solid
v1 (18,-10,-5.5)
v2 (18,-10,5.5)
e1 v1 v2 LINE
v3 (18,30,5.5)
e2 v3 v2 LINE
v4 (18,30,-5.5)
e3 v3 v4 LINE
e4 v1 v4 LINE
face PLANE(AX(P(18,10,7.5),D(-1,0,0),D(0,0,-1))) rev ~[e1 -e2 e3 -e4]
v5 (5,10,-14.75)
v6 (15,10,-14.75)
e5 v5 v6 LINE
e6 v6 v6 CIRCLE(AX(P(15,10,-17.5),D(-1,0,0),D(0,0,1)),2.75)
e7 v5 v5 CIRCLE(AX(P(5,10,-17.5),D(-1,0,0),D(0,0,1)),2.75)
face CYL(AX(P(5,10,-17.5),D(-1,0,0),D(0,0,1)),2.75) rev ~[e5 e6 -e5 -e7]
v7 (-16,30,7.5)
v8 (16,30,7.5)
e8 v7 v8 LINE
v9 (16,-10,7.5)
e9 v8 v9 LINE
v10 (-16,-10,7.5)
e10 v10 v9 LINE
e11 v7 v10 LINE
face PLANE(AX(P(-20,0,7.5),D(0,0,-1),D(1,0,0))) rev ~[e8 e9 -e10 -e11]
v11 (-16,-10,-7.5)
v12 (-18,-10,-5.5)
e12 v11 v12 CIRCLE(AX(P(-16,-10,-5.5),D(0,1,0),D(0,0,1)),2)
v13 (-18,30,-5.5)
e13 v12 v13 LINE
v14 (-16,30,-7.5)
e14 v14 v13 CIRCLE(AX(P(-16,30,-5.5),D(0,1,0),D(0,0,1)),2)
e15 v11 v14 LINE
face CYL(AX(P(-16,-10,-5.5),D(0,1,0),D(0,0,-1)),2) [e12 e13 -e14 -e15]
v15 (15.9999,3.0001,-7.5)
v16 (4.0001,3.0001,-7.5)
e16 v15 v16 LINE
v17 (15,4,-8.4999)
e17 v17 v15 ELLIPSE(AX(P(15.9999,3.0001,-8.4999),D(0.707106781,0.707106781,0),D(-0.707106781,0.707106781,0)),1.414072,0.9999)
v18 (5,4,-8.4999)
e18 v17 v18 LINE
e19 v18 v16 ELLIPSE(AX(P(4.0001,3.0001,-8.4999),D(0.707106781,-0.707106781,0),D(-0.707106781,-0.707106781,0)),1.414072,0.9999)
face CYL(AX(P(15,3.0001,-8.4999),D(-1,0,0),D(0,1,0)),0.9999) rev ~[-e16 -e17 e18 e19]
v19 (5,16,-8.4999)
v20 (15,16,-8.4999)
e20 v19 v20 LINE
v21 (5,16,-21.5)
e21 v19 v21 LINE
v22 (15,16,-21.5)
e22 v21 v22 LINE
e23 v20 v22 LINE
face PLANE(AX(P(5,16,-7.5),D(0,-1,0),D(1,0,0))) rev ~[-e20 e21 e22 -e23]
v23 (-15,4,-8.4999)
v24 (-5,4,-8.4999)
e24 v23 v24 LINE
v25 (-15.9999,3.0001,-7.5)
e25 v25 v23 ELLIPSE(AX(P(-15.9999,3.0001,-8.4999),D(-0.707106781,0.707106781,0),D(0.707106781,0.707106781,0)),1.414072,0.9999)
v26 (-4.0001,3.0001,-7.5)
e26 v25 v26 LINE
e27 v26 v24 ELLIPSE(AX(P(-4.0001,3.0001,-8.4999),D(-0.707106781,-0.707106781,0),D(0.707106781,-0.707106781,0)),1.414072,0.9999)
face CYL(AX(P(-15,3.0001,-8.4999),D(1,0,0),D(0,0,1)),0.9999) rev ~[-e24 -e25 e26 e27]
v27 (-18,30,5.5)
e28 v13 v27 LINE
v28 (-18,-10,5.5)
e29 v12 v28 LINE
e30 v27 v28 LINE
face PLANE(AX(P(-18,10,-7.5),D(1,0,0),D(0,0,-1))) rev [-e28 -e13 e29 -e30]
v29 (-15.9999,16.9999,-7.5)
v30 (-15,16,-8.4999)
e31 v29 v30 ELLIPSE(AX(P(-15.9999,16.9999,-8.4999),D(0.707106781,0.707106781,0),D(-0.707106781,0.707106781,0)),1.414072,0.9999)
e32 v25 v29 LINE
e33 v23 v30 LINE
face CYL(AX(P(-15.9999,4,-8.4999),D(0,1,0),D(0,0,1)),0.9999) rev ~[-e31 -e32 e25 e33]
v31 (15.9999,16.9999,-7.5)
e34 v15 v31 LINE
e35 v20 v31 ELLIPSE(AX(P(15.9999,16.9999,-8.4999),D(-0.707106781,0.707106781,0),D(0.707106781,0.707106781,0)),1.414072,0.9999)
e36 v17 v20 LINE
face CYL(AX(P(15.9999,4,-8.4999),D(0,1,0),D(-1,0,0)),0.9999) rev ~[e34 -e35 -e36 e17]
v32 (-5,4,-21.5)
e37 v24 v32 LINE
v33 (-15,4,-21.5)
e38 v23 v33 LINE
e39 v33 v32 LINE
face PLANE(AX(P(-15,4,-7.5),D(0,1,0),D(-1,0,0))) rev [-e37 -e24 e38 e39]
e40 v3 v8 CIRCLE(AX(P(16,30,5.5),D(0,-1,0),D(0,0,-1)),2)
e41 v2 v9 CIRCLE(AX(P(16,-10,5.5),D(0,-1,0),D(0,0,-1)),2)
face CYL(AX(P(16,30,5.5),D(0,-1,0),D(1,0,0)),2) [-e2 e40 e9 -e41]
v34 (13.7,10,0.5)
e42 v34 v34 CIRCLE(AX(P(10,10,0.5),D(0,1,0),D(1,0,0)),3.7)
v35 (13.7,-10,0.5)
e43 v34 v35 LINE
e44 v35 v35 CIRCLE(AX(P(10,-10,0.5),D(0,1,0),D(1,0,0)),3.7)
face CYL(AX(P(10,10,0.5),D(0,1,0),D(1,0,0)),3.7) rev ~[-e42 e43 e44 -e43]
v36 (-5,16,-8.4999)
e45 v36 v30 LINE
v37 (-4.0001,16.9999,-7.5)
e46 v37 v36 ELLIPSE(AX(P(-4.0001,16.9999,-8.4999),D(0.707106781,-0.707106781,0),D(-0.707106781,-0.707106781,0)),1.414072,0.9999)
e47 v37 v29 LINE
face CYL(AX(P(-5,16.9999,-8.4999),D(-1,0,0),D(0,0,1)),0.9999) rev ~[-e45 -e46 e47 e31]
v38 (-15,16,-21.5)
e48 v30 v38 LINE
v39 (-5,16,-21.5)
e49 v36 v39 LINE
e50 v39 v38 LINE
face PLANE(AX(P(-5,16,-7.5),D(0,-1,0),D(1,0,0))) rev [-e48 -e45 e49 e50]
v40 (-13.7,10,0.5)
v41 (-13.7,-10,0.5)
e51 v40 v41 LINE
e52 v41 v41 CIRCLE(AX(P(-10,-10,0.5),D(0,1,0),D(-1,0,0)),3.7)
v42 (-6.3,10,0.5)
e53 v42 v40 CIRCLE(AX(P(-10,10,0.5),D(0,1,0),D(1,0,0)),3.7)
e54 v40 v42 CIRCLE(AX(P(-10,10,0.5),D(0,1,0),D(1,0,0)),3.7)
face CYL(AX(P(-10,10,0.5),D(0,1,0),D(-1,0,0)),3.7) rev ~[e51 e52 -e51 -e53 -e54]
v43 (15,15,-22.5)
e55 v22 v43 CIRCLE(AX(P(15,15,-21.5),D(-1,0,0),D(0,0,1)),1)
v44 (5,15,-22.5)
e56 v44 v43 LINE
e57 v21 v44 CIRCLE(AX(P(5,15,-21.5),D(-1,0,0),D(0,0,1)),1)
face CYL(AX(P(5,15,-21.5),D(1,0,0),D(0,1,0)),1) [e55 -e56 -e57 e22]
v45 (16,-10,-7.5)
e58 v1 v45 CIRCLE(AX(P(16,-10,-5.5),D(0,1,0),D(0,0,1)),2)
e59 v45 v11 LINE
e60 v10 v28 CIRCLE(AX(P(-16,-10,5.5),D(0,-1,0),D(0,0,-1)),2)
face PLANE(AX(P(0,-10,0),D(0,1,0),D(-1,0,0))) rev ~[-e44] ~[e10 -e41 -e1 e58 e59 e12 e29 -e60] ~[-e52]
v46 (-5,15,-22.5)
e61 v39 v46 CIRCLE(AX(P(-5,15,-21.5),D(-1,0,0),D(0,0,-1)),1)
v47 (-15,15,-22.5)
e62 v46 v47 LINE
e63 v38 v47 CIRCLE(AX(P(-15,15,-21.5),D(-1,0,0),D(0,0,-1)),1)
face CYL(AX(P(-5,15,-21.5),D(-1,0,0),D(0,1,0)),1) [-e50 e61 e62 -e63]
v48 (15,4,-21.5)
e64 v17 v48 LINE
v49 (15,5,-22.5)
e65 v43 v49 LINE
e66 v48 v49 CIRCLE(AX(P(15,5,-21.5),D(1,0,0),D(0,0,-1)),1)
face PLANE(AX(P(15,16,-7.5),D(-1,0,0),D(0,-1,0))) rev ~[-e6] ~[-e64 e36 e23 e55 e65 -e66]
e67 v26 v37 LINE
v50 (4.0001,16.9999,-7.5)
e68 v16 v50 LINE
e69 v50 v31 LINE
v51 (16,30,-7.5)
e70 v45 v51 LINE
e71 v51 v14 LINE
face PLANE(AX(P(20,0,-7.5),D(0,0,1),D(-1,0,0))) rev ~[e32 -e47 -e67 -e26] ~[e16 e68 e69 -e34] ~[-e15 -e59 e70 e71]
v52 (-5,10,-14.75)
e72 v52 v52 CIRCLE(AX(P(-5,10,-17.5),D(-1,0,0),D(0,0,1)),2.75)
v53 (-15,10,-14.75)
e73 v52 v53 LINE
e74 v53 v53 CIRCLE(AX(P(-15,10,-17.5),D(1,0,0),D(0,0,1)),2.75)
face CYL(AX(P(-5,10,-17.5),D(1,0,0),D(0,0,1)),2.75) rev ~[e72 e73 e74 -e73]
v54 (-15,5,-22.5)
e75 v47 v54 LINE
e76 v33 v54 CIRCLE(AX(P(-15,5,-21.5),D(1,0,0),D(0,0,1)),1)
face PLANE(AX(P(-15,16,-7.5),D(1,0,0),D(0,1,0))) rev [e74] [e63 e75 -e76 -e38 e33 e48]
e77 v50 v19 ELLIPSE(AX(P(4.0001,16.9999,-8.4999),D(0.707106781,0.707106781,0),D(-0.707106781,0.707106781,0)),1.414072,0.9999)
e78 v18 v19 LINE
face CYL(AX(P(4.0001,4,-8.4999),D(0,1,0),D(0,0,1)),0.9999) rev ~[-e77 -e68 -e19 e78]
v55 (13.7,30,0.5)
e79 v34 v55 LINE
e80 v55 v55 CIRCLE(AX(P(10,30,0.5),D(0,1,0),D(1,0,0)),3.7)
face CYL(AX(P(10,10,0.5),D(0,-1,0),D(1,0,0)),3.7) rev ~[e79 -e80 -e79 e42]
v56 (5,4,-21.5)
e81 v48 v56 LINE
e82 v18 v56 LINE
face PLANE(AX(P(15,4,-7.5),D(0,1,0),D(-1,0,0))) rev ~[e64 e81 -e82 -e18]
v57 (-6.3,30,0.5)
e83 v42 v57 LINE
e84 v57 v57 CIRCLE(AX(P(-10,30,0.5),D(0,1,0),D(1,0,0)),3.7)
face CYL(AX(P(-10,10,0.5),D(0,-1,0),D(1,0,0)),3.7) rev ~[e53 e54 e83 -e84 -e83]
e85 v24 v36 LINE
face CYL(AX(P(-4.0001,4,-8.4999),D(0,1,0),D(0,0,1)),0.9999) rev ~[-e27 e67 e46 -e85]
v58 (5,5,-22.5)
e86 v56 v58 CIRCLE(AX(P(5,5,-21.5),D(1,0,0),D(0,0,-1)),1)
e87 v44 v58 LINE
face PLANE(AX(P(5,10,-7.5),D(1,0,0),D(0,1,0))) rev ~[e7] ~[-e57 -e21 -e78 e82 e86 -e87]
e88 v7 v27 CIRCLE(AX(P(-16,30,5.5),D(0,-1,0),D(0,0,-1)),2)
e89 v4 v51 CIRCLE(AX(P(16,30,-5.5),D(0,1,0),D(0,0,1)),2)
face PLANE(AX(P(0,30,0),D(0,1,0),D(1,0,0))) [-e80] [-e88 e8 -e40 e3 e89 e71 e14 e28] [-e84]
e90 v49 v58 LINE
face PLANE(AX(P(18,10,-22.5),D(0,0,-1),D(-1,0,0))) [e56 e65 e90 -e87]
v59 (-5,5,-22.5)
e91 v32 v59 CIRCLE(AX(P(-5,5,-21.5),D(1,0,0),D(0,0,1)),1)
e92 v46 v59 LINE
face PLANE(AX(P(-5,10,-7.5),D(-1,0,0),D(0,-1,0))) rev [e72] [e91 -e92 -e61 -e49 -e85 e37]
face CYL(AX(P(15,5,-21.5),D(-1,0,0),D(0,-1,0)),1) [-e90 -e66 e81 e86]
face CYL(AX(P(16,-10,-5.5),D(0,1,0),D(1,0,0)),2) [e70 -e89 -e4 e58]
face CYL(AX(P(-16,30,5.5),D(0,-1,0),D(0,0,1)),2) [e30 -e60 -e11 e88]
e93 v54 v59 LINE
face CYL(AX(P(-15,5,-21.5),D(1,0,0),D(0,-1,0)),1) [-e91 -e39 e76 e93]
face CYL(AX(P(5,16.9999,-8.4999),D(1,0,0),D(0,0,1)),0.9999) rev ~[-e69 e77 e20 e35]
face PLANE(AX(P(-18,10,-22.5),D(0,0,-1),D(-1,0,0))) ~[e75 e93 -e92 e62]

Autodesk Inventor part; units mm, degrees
ref_plane "YZ Plane" through (0, 0, 0) normal (1, 0, 0) x (0, 1, 0)
ref_plane "XZ Plane" through (0, 0, 0) normal (0, 1, 0) x (-1, 0, 0)
ref_plane "XY Plane" through (0, 0, 0) normal (0, 0, 1) x (1, 0, 0)
sketch "Szkic2" plane through (0, 0, 0) normal (0, 1, 0) x (-1, 0, 0)
  line L0 (-20, -7.5) -> (20, -7.5)
  line L1 (20, -7.5) -> (20, 7.5)
  line L2 (20, 7.5) -> (-20, 7.5)
  line L3 (-20, 7.5) -> (-20, -7.5)
  line L4 (-20, -7.5) -> (20, 7.5) construction
  line L5 (20, -7.5) -> (-20, 7.5) construction
  point P0 (0, 0)
  dimension "d12" = 40
  dimension "d13" = 15
extrude "Wyciągnięcie proste1" add sketch "Szkic2" along normal mid plane 20
sketch "Szkic3" plane through (0, 10, 0) normal (0, 1, 0) x (1, 0, 0)
  line L0 (18, 7.5) -> (-18, 7.5)
  line L1 (-18, 7.5) -> (-18, -7.5)
  line L2 (-18, -7.5) -> (18, -7.5)
  line L3 (18, -7.5) -> (18, 7.5)
  line L4 (18, 7.5) -> (-18, -7.5) construction
  line L5 (-18, 7.5) -> (18, -7.5) construction
  circle A0 centre (10, -0.5) radius 6
  circle A1 centre (-10, -0.5) radius 6
  circle A2 centre (10, -0.5) radius 3.7
  circle A3 centre (-10, -0.5) radius 3.7
  line L6 (-20, -7.5) -> (20, -7.5) projected
  point P0 (0, 0)
  point P1 (10, -7)
  point P2 (10, 8)
  point P3 (-13.3166, 8)
  point P4 (-10, -7)
  point P5 (15.1962, -4)
  point P6 (-15.1962, -4)
  dimension "d16" = 36
  dimension "d17" = 15
  dimension "d18" = 12
  dimension "d19" = 8
  dimension "d20" = 8
  dimension "d21" = 12
  dimension "d22" = 8
  dimension "d23" = 8
  dimension "d24" = 7.4
  dimension "d25" = 7.4
fillet "Zaokrąglenie1" radius 2 4 edges at (20, 0, 7.5) (-20, 0, 7.5) (20, 0, -7.5) (-20, 0, -7.5)
extrude "Wyciągnięcie proste3" add sketch "Szkic3" along normal blind 20 contours L3 L2 L1 L0 | A0 | A1
sketch "Szkic4" plane through (18, 10, -7.5) normal (0, 0, -1) x (-1, 0, 0)
  line L0 (33, 0) -> (23, -20) construction
  line L1 (23, 0) -> (33, -20) construction
  line L2 (13, 6) -> (3, 6)
  line L3 (3, 6) -> (3, -6)
  line L4 (3, -6) -> (13, -6)
  line L5 (13, -6) -> (13, 6)
  line L6 (13, 6) -> (3, -6) construction
  line L7 (3, 6) -> (13, -6) construction
  line L8 (36, -20) -> (0, -20) projected
  line L9 (0, 0) -> (36, 0) projected
  line L10 (-2, 0) -> (-2, -20) projected
  line L11 (0, 20) -> (36, 20) projected
  point P0 (18, -10)
  point P1 (28, -10)
  point P2 (8, 0)
  dimension "d32" = 14
  dimension "d38" = 10
  dimension "d39" = 5
  dimension "d68" = 14
extrude "Wyciągnięcie proste4" add sketch "Szkic4" along normal blind 15
sketch "Szkic7" plane through (5, 4, -7.5) normal (-1, 0, 0) x (0, 0, 1)
  line L0 (-15, 12) -> (-15, 0) projected
  line L1 (-15, 0) -> (-15, 3)
  line L2 (0, -14) -> (0, 6) projected
  line L3 (0, 0) -> (-15, 0) projected
  line L4 (0, 0) -> (-15, 0)
  line L5 (-15, 12) -> (-15, 9)
  line L6 (0, 12) -> (-15, 12) projected
  line L7 (0, 12) -> (-15, 12)
  circle A0 centre (-10, 6) radius 2.75
  point P0 (7.5, -4)
  dimension "d48" = 5.5
  dimension "d49" = 6
  dimension "d69" = 5
extrude "Wyciągnięcie proste6" cut sketch "Szkic7" against normal blind 15
mirror "Odbij1" about plane through (0, 0, 0) normal (1, 0, 0) of "Wyciągnięcie proste6", "Wyciągnięcie proste4"
sketch "Szkic11" plane through (0, 10, 0) normal (0, 1, 0) x (1, 0, 0)
  line L0 (18, -7.5) -> (-18, -7.5) projected
  line L1 (18, -7.5) -> (20, -7.5)
  line L2 (20, -7.5) -> (20, 7.5)
  line L3 (20, 7.5) -> (18, 7.5)
  line L4 (18, 7.5) -> (18, -7.5)
  point P0 (0, 0)
  dimension "d63" = 2
  dimension "d64" = 15
extrude "Wyciągnięcie proste7" cut sketch "Szkic11" against normal blind 20
mirror "Odbij3" about plane through (0, 0, 0) normal (1, 0, 0) of "Wyciągnięcie proste7"
fillet "Zaokrąglenie4" radius 2 4 edges at (-18, 10, 7.5) (-18, 10, -7.5) (18, 10, -7.5) (18, 10, 7.5)
fillet "Zaokrąglenie5" radius 1 4 edges at (-10, 16, -22.5) (-10, 4, -22.5) (10, 4, -22.5) (10, 16, -22.5)
fillet "Zaokrąglenie6" radius 1 8 edges at (-15, 10, -7.5) (-10, 16, -7.5) (-10, 4, -7.5) (-5, 10, -7.5) (10, 4, -7.5) (5, 10, -7.5) (15, 10, -7.5) (10, 16, -7.5)
sketch "Szkic12" plane through (10, 10, 0.5) normal (0, 1, 0) x (1, 0, 0)
  circle A0 centre (0, 0) radius 3.7
  point P0 (-10, 0.5)
extrude "Wyciągnięcie proste8" cut sketch "Szkic12" against normal blind 44
mirror "Odbij4" about plane through (0, 0, 0) normal (1, 0, 0) of "Wyciągnięcie proste8"
properties part number "zaslepka"
